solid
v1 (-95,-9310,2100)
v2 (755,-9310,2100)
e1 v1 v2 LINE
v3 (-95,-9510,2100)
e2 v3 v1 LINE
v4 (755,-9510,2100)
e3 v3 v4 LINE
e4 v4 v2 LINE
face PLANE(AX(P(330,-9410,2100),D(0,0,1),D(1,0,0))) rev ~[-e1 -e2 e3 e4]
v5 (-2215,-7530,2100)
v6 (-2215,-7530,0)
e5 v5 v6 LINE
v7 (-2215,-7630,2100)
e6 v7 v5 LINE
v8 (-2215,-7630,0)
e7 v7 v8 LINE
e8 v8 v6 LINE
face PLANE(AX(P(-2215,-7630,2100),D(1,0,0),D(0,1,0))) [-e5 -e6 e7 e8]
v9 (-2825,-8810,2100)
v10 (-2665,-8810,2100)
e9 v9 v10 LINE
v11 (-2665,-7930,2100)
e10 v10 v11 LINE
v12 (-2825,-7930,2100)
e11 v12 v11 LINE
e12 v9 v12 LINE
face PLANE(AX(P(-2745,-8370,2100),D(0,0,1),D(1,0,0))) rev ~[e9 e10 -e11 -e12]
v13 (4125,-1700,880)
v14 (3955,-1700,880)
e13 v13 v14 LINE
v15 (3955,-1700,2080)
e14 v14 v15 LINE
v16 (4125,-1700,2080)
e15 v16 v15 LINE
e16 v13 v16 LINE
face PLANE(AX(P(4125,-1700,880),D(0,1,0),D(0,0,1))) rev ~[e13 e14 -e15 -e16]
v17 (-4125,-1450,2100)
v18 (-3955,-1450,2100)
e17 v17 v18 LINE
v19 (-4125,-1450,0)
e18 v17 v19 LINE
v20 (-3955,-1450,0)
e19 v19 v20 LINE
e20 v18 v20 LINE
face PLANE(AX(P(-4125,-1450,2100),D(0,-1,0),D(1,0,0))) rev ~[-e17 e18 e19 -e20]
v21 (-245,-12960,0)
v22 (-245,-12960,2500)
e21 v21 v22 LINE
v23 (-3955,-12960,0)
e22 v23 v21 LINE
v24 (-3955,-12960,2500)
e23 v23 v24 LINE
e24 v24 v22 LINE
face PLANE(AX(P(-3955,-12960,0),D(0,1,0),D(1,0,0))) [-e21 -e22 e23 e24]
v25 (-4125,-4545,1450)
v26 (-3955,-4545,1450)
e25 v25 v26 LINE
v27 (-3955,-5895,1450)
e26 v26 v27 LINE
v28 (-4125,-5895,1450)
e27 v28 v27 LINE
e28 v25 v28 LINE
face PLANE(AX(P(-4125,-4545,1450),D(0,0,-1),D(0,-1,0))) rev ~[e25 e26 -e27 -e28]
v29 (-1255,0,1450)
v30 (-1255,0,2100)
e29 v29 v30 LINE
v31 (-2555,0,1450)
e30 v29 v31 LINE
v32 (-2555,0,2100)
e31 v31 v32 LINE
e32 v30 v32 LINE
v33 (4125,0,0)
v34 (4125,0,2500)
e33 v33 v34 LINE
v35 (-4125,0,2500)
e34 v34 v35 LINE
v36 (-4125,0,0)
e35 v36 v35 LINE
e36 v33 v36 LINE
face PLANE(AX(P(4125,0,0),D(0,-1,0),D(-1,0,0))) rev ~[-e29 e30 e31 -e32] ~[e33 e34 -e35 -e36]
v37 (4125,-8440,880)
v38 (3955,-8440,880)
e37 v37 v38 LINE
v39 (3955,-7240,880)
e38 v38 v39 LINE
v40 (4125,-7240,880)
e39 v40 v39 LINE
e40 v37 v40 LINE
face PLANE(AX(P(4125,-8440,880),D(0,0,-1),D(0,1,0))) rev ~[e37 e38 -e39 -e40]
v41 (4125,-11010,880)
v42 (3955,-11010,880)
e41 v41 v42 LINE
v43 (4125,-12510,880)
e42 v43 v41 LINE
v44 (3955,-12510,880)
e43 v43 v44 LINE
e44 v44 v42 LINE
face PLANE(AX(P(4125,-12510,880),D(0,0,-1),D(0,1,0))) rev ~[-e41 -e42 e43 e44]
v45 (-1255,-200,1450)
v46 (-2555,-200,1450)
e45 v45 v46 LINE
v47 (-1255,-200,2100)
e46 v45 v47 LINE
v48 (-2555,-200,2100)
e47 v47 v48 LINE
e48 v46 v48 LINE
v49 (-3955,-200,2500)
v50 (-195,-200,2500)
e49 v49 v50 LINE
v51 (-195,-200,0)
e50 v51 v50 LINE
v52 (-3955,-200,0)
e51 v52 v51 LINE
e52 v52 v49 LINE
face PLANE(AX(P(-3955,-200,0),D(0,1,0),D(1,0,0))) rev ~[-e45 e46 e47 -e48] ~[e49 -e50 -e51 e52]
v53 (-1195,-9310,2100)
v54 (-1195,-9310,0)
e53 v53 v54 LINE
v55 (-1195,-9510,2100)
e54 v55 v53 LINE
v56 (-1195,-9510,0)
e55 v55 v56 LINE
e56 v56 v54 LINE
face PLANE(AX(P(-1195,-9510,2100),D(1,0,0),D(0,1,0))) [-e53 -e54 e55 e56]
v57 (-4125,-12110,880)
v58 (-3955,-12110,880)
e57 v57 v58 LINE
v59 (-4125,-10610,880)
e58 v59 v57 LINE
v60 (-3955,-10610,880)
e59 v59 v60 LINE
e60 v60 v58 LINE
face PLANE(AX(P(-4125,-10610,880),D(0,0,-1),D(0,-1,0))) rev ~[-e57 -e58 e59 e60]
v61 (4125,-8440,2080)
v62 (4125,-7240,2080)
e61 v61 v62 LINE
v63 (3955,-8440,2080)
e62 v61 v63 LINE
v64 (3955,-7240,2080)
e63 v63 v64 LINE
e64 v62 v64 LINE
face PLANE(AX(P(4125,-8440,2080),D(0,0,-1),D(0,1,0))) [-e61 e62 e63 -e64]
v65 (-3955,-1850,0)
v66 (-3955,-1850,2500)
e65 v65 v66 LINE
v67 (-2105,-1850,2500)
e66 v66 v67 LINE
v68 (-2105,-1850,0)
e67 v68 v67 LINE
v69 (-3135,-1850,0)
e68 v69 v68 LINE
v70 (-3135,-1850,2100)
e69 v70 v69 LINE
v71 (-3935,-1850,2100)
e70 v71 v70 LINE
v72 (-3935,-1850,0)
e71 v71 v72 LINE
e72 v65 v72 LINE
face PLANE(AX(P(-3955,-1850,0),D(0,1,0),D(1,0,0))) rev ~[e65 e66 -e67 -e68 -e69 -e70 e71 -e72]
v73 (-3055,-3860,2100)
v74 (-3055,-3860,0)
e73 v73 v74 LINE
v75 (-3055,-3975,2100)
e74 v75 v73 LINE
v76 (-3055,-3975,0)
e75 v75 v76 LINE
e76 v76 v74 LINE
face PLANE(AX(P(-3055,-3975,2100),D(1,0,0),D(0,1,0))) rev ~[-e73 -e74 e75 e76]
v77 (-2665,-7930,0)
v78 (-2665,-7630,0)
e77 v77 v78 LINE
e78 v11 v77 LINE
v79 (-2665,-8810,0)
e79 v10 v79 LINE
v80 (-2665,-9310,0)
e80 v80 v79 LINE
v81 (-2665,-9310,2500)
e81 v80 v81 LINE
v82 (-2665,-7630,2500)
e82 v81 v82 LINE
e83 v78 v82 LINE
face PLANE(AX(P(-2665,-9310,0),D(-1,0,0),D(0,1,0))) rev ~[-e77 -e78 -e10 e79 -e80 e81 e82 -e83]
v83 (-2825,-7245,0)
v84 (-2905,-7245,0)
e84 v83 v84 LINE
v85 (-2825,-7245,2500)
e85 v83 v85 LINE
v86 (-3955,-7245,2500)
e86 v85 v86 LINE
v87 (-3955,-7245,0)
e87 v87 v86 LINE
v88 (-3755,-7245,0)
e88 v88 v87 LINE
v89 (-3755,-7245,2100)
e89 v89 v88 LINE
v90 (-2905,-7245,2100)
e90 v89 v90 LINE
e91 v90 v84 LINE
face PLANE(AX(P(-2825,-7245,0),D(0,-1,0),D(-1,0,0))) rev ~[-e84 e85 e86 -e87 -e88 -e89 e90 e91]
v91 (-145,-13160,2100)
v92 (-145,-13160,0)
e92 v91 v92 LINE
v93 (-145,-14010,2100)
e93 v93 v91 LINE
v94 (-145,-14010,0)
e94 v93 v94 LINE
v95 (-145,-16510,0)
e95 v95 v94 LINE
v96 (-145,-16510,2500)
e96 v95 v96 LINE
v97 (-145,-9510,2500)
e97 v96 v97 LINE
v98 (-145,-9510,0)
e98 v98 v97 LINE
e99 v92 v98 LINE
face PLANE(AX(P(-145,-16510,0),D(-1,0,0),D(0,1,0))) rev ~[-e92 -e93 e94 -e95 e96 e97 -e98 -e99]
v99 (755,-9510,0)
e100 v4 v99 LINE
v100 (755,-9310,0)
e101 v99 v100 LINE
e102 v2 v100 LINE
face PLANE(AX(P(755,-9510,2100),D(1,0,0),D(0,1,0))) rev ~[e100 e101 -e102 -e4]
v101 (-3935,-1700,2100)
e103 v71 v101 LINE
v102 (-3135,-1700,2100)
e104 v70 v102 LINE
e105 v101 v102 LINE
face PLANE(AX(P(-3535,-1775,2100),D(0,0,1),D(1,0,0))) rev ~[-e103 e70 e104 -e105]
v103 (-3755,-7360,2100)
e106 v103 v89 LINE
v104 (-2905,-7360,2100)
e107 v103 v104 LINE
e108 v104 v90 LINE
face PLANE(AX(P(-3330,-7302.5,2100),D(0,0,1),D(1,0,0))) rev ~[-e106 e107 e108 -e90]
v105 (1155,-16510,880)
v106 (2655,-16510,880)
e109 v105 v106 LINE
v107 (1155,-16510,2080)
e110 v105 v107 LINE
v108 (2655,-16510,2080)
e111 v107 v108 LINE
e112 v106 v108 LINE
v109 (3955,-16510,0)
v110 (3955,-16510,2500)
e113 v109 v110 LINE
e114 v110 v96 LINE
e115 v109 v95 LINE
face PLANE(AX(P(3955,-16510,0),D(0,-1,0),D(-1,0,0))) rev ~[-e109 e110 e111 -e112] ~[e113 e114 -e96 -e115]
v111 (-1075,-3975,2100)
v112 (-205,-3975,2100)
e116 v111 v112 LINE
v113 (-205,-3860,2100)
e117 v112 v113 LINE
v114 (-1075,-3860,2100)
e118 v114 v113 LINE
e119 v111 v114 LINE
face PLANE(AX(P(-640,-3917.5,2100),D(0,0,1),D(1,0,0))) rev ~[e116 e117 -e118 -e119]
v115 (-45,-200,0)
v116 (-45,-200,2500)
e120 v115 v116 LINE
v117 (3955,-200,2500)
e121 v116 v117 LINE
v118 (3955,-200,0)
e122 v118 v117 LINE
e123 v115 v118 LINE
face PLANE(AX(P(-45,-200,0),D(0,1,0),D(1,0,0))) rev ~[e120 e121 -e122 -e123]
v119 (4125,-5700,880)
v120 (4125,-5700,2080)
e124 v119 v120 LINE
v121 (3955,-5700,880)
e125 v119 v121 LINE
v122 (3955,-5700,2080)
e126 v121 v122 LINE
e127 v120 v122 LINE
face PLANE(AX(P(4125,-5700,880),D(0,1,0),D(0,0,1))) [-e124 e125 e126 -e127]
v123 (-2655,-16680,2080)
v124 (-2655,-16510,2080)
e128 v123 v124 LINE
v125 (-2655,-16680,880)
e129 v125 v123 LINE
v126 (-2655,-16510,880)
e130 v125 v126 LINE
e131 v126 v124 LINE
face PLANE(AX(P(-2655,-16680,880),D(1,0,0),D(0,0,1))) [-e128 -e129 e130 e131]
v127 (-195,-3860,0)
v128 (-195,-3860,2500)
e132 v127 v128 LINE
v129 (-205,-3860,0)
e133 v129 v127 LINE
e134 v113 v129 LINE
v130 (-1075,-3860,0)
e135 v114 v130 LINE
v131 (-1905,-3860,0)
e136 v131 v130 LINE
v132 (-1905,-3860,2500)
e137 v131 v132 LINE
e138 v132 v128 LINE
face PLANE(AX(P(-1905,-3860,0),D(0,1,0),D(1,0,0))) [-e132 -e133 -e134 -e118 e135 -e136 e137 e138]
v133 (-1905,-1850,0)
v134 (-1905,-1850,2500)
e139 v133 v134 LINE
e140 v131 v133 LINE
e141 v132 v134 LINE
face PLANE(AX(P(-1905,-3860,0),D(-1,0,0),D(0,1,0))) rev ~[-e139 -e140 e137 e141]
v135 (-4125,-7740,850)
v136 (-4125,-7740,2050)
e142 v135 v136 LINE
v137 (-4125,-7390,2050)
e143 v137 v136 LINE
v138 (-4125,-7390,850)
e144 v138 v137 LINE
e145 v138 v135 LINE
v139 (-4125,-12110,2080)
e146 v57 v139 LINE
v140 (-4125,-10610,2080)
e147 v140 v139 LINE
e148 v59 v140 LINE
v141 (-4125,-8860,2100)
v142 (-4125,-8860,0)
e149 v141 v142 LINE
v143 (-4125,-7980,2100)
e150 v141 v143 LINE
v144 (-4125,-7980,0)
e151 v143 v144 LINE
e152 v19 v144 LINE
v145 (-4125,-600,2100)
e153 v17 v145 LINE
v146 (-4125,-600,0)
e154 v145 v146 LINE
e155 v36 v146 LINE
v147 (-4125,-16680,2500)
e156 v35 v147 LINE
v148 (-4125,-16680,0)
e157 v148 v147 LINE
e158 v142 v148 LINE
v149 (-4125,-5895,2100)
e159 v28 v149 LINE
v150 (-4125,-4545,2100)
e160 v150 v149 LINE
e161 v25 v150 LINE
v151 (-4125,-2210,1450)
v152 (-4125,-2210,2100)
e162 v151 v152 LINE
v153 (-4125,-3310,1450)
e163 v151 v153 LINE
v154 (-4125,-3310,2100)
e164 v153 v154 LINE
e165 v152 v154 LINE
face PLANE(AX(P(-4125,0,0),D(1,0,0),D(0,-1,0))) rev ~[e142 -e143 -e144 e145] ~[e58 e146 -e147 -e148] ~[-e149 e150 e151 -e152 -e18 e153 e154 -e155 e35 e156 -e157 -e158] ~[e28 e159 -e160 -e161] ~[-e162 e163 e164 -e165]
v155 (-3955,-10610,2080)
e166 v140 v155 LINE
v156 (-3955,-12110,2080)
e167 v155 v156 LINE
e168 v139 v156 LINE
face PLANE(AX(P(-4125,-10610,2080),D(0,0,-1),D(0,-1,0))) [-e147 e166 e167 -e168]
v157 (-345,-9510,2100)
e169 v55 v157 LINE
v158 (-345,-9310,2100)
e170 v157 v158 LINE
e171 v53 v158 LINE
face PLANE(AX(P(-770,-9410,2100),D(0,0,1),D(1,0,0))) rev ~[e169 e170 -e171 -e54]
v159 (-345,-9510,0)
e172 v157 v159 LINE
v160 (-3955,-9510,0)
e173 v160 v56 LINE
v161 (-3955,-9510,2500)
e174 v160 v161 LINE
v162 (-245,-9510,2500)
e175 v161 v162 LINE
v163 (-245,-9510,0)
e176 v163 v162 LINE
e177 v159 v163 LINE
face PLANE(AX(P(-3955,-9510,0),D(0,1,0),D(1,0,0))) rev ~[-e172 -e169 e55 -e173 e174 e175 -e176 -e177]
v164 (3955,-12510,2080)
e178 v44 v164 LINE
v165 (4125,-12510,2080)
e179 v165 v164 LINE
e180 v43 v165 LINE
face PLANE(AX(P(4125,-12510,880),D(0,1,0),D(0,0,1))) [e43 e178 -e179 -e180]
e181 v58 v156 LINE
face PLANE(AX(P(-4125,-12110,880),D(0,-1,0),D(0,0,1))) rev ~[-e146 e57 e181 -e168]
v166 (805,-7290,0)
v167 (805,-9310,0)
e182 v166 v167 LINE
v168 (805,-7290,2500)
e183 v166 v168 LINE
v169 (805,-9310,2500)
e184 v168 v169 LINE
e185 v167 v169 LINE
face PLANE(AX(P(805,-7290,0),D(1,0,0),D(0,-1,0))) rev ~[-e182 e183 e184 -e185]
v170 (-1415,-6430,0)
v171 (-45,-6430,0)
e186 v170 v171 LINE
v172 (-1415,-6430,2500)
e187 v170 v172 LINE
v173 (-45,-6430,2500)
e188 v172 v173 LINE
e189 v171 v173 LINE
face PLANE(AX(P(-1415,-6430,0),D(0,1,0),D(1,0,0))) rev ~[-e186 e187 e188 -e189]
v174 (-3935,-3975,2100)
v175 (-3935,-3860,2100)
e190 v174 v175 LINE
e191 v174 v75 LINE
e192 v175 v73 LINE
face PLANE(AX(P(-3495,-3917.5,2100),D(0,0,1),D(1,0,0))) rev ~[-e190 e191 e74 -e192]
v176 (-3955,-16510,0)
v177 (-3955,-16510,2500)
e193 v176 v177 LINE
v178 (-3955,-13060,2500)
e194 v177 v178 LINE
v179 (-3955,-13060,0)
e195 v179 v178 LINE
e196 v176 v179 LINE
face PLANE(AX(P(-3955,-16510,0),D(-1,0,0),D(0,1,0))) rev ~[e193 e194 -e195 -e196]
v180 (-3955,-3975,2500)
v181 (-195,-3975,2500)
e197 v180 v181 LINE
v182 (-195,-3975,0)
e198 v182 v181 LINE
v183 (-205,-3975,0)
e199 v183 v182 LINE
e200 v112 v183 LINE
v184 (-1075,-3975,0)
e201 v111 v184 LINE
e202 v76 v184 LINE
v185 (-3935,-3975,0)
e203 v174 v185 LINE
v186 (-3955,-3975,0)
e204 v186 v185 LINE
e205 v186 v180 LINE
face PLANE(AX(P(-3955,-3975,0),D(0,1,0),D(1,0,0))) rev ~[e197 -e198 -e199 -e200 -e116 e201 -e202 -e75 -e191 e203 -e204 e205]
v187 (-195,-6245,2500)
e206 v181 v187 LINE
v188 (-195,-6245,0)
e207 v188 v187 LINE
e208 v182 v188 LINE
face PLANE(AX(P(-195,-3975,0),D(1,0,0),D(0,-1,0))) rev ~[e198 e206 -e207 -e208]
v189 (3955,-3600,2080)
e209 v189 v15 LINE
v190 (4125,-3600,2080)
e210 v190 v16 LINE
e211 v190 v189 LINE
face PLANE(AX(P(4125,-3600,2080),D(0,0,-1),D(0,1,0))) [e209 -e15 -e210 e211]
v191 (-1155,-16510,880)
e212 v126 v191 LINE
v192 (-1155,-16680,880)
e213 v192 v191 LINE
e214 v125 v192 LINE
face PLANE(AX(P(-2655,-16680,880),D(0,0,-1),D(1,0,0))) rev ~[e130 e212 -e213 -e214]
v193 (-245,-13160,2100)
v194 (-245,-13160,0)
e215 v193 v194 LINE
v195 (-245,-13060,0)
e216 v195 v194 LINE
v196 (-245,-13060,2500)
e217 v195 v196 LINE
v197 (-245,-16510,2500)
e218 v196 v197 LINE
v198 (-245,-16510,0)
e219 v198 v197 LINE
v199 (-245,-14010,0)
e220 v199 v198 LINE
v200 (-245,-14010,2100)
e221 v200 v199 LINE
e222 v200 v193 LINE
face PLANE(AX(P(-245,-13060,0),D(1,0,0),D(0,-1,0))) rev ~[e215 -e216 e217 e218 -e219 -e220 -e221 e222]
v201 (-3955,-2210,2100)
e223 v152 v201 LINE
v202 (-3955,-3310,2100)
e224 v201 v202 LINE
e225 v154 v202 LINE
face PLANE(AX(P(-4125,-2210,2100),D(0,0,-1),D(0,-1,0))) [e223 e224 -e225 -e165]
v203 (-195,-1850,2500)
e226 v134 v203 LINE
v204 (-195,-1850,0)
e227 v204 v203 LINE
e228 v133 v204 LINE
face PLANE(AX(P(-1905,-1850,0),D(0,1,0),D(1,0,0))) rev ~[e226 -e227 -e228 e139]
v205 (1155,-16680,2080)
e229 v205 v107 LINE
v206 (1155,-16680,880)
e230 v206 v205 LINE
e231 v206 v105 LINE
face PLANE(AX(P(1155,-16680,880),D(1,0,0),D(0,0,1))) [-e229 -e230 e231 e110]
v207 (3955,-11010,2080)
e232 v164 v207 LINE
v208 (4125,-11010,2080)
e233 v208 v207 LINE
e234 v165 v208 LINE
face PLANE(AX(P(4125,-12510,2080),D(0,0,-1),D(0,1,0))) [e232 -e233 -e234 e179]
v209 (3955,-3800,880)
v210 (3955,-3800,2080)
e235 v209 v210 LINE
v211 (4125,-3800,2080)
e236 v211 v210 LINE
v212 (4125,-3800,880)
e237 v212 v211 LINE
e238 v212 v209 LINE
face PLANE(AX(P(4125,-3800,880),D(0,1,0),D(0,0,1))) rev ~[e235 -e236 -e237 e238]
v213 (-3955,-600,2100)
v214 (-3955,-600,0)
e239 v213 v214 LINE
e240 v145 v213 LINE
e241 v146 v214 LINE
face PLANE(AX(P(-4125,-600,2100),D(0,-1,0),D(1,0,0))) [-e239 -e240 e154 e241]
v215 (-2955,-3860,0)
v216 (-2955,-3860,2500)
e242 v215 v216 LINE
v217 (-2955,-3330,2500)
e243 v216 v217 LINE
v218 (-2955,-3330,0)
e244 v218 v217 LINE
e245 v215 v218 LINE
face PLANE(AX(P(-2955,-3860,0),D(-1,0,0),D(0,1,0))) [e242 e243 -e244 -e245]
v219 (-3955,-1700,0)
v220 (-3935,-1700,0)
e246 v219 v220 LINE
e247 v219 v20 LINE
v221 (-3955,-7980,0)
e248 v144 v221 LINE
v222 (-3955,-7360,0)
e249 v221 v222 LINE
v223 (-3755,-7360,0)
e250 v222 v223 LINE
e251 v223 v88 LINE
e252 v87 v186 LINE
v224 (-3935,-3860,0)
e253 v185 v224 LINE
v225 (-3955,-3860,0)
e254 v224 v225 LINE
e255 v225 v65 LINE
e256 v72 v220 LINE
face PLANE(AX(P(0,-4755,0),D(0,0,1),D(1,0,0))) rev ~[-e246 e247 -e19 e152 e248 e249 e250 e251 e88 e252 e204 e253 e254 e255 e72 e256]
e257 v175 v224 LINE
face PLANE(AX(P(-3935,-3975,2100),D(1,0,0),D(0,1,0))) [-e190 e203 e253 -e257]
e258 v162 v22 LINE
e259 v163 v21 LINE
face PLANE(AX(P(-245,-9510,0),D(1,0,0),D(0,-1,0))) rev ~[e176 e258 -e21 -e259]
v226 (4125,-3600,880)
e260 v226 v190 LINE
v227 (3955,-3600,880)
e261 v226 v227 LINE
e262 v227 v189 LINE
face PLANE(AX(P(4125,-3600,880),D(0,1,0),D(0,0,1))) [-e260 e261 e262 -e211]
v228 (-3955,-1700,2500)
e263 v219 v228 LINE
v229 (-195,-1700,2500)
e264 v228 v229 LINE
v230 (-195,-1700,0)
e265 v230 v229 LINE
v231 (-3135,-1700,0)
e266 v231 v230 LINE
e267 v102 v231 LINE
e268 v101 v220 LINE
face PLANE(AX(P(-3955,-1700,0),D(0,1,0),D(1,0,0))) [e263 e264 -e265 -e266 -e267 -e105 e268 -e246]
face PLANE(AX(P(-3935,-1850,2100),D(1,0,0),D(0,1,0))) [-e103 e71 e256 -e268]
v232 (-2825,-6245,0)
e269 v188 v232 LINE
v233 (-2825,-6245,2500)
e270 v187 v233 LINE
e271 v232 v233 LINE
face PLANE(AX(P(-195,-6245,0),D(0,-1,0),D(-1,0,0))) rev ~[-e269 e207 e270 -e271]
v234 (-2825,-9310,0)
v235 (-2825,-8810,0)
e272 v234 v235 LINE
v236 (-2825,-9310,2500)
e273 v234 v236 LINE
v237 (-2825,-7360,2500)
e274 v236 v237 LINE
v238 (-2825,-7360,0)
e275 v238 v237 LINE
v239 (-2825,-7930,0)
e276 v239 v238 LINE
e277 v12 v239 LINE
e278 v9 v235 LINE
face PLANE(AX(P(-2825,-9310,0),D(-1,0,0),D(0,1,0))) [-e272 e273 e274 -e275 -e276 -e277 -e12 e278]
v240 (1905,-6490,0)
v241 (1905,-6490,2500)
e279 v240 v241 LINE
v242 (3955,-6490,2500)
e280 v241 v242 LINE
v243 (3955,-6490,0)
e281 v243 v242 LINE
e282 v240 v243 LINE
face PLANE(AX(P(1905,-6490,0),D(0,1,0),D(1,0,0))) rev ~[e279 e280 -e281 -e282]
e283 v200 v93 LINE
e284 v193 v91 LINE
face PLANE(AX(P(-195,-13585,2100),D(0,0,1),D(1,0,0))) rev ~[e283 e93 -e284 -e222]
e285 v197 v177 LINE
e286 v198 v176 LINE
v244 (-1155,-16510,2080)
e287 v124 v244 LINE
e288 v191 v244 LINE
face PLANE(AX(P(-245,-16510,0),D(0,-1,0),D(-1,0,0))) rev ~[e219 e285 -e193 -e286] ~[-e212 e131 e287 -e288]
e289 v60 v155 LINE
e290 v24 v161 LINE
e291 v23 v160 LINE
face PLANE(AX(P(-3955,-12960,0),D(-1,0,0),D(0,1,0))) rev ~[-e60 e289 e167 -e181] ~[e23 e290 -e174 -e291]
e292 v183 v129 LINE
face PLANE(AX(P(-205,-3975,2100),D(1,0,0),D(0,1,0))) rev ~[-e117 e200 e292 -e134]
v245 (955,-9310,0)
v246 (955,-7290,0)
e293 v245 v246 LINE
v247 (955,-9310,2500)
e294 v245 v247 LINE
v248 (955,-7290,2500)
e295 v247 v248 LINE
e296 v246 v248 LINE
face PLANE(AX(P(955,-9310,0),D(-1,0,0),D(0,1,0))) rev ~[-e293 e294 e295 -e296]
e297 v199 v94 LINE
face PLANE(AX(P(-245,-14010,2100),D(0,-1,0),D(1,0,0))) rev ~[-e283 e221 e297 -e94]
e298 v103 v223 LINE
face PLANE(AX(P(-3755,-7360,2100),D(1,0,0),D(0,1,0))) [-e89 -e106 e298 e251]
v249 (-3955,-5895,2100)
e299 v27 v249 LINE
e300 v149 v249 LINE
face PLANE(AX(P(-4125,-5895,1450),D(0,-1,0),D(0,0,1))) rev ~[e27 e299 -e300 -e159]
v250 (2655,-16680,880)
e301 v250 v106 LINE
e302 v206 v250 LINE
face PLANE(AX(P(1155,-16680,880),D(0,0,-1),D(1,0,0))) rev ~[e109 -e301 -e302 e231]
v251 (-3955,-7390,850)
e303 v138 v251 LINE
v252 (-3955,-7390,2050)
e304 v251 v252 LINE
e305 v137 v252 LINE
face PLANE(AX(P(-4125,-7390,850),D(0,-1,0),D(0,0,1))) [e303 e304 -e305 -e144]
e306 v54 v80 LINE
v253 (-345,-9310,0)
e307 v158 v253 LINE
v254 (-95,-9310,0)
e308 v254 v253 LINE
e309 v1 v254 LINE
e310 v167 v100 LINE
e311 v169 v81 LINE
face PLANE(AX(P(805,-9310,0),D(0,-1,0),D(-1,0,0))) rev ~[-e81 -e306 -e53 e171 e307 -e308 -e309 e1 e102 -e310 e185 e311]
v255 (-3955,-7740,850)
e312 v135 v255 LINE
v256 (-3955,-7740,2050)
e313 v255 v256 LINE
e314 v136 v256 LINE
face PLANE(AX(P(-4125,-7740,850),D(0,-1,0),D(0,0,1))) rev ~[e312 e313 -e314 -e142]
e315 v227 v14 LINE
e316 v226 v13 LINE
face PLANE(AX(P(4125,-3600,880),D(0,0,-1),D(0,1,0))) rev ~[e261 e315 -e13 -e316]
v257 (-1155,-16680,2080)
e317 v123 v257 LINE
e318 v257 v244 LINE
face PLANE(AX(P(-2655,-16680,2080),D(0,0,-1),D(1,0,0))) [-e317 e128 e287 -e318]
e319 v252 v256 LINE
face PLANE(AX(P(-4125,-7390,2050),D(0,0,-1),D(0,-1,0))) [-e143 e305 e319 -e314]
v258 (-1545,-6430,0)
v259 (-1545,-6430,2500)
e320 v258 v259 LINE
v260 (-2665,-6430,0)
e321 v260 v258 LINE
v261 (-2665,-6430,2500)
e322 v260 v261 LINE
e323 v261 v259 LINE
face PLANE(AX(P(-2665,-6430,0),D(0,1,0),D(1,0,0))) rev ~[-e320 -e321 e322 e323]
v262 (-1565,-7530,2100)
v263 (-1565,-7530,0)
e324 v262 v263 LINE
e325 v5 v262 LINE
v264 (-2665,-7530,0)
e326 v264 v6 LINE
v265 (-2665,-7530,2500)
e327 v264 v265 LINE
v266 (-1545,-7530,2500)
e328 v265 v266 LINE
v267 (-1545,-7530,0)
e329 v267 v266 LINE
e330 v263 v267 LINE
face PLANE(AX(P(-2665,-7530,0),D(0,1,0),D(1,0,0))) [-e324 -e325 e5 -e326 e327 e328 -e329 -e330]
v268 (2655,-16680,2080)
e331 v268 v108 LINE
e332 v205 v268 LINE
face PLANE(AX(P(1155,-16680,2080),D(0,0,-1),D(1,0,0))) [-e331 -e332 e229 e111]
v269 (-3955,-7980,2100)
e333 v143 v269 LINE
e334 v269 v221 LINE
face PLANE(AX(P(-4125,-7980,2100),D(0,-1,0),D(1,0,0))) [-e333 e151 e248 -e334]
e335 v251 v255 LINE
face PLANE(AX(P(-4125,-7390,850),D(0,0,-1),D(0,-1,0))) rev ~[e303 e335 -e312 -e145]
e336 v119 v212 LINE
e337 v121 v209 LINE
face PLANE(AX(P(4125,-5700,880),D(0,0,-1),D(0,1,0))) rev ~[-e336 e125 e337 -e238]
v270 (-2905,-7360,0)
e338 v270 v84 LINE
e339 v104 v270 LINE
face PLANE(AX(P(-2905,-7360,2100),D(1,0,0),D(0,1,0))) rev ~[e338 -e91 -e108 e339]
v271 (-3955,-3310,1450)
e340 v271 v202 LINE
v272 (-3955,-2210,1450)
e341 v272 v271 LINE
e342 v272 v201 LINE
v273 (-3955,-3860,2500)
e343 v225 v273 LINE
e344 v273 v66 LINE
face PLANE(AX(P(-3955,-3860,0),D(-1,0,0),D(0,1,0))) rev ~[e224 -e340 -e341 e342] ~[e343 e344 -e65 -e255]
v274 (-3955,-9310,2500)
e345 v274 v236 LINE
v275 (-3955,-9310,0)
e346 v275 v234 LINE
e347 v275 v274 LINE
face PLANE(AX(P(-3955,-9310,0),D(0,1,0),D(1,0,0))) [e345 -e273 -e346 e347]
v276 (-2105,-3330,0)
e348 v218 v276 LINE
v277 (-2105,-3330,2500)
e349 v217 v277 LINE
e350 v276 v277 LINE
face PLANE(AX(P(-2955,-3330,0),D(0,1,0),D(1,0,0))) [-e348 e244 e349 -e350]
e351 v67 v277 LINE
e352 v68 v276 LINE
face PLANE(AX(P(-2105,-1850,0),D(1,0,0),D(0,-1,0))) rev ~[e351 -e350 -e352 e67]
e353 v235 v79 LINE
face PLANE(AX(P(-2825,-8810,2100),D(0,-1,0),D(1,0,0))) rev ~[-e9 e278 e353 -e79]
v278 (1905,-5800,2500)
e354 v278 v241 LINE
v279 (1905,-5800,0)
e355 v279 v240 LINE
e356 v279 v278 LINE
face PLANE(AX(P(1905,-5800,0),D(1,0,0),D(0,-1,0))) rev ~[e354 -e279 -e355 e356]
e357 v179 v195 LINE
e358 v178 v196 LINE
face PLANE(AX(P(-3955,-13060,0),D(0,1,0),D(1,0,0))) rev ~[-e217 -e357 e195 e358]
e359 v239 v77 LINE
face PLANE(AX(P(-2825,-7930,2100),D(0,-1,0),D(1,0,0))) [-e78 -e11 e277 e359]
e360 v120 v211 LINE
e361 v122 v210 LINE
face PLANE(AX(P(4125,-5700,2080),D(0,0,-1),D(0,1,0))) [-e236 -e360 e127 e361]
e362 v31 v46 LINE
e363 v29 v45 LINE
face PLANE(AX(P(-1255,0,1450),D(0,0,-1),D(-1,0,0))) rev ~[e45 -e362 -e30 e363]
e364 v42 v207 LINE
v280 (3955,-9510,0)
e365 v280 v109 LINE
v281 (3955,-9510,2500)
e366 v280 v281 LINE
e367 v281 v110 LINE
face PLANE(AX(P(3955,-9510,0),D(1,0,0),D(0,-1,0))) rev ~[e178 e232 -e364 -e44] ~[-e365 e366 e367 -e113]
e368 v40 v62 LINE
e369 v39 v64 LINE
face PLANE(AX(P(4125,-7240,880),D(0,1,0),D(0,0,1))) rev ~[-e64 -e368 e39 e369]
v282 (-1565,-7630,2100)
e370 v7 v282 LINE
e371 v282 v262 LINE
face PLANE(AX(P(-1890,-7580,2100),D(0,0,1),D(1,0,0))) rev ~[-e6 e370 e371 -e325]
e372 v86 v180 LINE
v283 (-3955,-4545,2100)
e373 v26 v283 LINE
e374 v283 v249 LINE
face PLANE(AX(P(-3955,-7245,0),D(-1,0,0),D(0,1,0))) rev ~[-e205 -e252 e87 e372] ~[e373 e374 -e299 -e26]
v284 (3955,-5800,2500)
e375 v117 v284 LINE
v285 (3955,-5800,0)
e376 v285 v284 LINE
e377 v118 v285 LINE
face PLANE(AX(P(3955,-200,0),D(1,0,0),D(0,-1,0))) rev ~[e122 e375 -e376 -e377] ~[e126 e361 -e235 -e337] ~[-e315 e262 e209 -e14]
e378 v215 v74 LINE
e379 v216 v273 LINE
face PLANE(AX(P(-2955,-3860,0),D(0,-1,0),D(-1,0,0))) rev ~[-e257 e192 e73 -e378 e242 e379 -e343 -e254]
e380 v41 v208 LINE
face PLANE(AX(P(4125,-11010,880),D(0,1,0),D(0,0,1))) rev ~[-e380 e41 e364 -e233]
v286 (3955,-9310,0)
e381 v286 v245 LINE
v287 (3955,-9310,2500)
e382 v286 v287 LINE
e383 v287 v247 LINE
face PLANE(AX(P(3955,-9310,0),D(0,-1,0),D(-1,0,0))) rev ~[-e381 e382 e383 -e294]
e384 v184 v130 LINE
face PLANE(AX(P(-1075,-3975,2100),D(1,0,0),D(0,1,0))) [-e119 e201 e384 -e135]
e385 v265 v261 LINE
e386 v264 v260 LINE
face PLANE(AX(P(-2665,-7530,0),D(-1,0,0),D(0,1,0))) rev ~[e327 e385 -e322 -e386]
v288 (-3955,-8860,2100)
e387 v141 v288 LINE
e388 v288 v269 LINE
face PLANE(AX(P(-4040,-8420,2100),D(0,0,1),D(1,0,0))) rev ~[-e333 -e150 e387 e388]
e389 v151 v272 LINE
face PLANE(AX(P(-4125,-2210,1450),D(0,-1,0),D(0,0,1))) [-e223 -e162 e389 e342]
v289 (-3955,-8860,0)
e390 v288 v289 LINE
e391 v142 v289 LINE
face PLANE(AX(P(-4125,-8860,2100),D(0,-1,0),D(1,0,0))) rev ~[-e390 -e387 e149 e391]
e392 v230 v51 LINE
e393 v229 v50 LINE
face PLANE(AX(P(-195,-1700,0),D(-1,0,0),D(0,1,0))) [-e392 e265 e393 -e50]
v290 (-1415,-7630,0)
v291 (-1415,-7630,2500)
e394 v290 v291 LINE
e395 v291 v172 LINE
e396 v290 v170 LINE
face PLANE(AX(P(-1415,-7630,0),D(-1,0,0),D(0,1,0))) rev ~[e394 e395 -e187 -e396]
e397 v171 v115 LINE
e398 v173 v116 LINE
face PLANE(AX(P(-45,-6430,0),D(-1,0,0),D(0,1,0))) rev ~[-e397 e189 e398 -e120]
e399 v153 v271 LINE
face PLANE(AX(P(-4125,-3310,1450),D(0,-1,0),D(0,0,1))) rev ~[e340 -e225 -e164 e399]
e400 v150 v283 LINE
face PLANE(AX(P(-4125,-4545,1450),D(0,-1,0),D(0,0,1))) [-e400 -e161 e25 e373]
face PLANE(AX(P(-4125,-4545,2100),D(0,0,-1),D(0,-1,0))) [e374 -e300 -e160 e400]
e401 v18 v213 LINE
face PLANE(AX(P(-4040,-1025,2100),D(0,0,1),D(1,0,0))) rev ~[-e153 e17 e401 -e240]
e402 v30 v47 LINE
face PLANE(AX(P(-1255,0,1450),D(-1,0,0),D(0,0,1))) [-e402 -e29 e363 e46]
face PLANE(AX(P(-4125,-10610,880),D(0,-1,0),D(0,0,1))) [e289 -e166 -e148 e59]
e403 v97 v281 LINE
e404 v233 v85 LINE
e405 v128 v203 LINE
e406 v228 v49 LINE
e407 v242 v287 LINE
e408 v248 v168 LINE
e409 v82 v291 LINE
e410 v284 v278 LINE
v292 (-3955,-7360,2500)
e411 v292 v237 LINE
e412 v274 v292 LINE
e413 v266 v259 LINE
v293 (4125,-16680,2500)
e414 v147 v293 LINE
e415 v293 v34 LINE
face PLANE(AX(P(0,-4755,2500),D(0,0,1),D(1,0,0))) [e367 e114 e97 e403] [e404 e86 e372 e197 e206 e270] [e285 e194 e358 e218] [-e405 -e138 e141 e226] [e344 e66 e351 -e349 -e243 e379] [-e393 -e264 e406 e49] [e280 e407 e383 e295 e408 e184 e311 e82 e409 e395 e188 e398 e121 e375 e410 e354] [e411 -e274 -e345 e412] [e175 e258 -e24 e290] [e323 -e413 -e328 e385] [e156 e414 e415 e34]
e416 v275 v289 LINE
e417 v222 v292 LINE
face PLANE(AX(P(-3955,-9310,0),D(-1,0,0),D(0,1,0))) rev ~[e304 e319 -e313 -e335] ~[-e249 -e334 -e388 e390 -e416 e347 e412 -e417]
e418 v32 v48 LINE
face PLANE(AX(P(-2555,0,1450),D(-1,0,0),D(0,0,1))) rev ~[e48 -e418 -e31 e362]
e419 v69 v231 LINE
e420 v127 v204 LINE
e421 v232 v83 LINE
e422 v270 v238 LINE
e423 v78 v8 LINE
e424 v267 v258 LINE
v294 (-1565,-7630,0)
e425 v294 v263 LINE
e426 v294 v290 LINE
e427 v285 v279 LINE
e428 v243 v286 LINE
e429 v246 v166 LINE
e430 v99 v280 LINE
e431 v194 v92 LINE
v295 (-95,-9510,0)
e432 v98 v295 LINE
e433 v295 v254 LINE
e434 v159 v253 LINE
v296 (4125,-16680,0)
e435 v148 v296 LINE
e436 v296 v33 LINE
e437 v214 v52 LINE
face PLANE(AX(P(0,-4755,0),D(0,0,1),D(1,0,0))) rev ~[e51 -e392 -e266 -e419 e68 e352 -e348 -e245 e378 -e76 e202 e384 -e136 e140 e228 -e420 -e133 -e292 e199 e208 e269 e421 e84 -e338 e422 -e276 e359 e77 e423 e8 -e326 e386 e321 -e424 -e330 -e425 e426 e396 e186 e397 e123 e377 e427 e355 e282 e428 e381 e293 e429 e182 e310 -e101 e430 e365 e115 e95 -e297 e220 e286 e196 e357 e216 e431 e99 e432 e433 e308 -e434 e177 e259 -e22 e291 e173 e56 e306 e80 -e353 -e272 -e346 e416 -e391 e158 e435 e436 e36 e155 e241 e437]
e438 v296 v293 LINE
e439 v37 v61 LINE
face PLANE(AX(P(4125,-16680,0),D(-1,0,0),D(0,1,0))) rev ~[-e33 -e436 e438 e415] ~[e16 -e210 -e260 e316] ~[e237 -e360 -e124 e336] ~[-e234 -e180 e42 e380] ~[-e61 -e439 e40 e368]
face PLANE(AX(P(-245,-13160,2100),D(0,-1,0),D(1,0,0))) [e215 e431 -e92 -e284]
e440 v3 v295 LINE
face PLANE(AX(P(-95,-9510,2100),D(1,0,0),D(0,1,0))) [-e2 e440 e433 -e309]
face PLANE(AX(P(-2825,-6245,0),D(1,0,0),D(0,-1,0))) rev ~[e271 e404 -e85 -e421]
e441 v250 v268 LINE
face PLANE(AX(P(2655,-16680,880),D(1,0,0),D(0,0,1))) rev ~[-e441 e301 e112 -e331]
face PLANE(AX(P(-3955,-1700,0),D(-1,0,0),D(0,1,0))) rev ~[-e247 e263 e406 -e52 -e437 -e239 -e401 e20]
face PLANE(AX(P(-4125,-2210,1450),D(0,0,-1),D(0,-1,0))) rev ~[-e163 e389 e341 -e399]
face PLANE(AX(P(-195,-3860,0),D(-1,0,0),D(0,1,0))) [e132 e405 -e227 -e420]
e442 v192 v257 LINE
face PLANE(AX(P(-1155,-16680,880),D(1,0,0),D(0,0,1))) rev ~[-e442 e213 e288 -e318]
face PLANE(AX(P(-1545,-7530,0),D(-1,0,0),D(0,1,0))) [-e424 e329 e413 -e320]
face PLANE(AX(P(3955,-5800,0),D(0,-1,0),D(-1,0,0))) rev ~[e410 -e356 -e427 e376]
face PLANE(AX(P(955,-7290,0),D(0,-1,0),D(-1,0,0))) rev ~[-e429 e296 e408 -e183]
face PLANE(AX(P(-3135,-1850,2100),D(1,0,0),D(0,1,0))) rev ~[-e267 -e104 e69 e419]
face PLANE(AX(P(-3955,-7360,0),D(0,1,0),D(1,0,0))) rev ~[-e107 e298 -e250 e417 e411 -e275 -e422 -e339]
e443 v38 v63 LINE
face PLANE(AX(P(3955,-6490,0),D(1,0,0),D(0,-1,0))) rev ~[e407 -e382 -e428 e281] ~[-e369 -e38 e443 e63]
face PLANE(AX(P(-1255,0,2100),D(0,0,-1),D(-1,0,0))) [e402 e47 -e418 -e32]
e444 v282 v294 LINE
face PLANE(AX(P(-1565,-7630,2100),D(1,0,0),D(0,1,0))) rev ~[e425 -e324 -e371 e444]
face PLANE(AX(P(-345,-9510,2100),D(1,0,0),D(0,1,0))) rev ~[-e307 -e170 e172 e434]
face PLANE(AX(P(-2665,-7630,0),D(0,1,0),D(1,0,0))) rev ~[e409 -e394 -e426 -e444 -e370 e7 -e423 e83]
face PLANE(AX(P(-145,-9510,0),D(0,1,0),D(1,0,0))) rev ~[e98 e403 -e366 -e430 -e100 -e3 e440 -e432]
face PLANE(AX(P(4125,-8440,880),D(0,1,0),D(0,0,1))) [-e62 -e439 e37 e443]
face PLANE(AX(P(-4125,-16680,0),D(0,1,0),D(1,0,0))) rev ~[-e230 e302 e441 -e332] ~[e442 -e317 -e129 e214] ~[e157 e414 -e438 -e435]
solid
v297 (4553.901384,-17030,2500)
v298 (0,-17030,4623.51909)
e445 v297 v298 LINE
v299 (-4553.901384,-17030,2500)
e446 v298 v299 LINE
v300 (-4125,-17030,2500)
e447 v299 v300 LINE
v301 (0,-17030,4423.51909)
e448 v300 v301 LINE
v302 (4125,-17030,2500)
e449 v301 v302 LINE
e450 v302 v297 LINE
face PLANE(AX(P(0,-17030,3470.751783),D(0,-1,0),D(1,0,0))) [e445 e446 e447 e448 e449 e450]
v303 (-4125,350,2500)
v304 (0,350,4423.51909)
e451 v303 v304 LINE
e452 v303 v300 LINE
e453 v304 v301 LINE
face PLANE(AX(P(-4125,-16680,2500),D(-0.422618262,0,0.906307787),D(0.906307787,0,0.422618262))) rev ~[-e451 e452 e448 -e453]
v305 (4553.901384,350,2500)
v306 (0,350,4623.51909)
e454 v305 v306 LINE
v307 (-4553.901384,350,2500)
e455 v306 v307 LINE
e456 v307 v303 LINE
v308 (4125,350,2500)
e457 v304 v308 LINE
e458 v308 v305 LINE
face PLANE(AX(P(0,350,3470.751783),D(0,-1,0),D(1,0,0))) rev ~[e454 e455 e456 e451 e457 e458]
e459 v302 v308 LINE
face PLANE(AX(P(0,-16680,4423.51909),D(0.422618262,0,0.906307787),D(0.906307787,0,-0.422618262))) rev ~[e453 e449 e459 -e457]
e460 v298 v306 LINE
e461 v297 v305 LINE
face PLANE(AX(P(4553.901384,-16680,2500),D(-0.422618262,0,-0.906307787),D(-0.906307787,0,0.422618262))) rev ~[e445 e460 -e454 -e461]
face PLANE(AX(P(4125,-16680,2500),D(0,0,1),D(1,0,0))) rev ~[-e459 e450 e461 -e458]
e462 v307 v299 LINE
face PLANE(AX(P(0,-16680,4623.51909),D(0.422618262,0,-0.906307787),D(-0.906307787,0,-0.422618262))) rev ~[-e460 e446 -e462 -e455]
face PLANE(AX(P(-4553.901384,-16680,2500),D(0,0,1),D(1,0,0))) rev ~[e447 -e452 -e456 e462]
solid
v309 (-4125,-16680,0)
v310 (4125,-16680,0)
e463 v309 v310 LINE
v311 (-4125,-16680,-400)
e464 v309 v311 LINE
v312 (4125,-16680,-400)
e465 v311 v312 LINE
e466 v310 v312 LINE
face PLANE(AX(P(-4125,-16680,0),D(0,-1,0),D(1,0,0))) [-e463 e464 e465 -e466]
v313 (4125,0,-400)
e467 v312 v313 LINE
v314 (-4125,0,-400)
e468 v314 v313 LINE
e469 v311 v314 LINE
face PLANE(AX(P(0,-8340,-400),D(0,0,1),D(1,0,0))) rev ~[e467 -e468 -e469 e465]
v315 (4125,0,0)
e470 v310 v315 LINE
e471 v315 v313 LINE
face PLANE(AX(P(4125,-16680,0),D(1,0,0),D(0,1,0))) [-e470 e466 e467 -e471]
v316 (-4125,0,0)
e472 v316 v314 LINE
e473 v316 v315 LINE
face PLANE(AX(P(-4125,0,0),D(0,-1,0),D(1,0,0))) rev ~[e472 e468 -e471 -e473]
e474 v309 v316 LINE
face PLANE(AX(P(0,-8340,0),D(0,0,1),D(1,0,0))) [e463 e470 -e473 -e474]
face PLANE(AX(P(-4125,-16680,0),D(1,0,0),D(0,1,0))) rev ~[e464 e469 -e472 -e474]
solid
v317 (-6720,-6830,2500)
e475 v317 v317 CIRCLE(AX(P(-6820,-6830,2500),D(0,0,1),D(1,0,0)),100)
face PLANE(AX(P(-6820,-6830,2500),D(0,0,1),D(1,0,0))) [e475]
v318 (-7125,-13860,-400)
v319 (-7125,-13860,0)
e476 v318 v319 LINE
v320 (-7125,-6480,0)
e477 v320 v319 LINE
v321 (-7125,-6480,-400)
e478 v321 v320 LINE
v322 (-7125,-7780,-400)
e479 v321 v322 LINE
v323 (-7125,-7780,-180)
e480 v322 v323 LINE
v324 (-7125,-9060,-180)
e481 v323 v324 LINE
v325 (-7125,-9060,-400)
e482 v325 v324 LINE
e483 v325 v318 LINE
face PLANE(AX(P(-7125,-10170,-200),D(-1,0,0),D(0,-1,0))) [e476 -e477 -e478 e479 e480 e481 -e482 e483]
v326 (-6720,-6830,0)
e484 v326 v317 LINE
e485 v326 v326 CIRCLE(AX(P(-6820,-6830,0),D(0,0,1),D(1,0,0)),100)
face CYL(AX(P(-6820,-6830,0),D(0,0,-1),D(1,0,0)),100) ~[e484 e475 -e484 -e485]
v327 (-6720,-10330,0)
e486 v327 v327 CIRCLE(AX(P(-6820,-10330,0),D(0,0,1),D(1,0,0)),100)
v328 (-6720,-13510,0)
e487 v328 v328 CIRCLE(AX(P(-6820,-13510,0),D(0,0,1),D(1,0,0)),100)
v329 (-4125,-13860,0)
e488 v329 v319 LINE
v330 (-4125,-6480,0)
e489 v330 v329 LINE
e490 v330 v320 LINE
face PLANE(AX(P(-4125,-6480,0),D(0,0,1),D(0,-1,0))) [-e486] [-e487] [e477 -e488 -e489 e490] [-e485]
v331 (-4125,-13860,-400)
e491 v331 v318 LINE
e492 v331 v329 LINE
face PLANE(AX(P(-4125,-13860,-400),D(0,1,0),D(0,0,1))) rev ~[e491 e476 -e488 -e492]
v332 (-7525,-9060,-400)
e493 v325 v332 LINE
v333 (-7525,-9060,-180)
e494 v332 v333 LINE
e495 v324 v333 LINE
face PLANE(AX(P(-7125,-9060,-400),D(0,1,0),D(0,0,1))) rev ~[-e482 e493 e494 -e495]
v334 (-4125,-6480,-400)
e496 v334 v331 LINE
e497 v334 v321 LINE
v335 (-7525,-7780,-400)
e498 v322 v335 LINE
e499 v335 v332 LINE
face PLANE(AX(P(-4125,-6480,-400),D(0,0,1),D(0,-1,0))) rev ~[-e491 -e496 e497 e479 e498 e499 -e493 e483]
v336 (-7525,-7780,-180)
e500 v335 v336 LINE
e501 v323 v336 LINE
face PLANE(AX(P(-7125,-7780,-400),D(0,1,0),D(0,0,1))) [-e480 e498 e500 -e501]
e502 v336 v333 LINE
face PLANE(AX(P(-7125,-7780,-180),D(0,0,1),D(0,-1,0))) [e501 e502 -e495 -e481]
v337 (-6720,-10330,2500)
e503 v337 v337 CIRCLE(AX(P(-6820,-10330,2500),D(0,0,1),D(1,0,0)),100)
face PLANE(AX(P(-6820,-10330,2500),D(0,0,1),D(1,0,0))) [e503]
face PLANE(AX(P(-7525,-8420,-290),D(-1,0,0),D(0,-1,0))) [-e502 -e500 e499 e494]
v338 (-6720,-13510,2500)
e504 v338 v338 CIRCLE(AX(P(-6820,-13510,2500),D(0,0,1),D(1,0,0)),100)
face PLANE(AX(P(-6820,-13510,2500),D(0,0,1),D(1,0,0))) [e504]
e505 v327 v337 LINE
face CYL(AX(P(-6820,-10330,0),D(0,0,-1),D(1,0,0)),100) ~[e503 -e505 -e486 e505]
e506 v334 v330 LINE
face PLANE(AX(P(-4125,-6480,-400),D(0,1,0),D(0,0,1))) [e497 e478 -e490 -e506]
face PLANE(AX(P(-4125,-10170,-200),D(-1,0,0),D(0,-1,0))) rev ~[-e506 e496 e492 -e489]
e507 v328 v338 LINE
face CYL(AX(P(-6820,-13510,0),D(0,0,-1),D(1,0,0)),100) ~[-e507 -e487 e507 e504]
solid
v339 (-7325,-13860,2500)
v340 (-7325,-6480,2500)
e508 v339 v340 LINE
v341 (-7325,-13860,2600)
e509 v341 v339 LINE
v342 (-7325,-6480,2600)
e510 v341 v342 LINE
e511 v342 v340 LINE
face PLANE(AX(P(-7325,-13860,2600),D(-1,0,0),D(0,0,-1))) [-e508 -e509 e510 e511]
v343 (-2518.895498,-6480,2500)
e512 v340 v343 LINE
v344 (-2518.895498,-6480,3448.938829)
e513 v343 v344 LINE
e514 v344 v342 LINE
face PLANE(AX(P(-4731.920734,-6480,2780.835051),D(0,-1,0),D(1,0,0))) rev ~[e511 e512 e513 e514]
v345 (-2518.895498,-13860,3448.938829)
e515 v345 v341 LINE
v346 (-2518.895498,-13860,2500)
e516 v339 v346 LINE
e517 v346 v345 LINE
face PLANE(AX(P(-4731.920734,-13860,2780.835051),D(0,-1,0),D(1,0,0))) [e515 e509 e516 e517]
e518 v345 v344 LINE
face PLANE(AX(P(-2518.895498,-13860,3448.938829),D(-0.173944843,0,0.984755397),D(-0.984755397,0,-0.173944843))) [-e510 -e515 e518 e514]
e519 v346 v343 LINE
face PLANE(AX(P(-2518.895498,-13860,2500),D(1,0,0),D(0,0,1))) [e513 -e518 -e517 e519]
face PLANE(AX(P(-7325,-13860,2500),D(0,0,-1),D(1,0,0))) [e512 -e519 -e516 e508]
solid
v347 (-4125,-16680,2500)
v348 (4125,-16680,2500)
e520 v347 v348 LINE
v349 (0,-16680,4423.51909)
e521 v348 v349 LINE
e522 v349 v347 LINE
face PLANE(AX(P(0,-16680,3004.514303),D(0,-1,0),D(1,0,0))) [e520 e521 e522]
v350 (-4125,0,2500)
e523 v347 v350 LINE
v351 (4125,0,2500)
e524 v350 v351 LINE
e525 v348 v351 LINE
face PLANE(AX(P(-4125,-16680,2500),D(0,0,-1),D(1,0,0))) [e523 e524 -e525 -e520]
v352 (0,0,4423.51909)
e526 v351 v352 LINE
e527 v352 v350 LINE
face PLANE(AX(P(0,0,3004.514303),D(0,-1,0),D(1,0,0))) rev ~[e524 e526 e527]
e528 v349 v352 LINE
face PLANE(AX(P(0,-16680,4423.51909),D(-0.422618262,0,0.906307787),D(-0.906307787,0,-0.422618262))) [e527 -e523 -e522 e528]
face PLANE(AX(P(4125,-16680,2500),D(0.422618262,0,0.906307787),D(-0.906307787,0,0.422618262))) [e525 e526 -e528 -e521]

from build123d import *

# Parameters (mm, degrees)
F0_W           = 1130
F0_H           = 1950
F0_W_2         = 1120
F0_H_2         = 1100
F0_W_3         = 3760
F0_H_3         = 1500
F0_W_4         = 1710
F0_H_4         = 2010
F0_W_5         = 850
F0_H_5         = 530
F0_W_6         = 3710
F0_H_6         = 100
F1_DEPTH       = 2500
F3_START       = -400
F2_W           = 170
F2_H           = 850
F2_W_2         = 800
F2_H_2         = 150
F2_W_3         = 880
F2_H_3         = 115
F2_W_4         = 870
F2_W_5         = 850
F2_H_4         = 880
F2_W_6         = 650
F2_H_5         = 100
F2_W_7         = 160
F2_H_6         = 200
F2_W_8         = 100
F3_DEPTH       = 2100
F4_W           = 8250
F4_H           = 16680
F5_DEPTH       = 400
F6_W           = 1100
F6_H           = 650
F6_W_2         = 1350
F6_W_3         = 350
F6_H_2         = 1200
F6_W_4         = 1500
F10_DEPTH      = 170
F7_W           = 1300
F7_H           = 650
F11_DEPTH      = 200
F8_W           = 1200
F8_H           = 1200
F8_W_2         = 1900
F8_W_3         = 1500
F12_DEPTH      = 170
F9_W           = 1500
F9_H           = 1200
F13_DEPTH      = 170
F15_DEPTH      = 16680
F17_DEPTH      = 17030
F17_DEPTH_BACK = 350
F18_W          = 7380
F18_H          = 400
F19_DEPTH      = 3000
F20_W          = 1280
F20_H          = 220
F21_DEPTH      = 400
F22_R          = 100
F23_DEPTH      = 2500
F25_DEPTH      = 7380


# Not quite as in the source:
# - a feature names something its author has since deleted; it is built from what else it names


with BuildPart() as f1:
    # F0 (on Top) → F1 (new body)
    with BuildSketch(Plane.XY):
        Polygon((4125, 0), (-4125, 0), (-4125, -9510), (-3955, -9510), (-245, -9510), (-145, -9510), (3955, -9510), (4125, -9510), align=None)
        with Locations((-3390, -8335)):
            Rectangle(F0_W, F0_H, mode=Mode.SUBTRACT)
        with Locations((-2105, -6980)):
            Rectangle(F0_W_2, F0_H_2, mode=Mode.SUBTRACT)
        Polygon((-3955, -6245), (-3955, -3975), (-195, -3975), (-195, -6245), (-2825, -6245), (-2825, -7245), (-3955, -7245), align=None, mode=Mode.SUBTRACT)
        Polygon((-3955, -3860), (-3955, -1850), (-2105, -1850), (-2105, -3330), (-2105, -3860), (-2955, -3860), align=None, mode=Mode.SUBTRACT)
        with Locations((-2075, -950)):
            Rectangle(F0_W_3, F0_H_3, mode=Mode.SUBTRACT)
        with Locations((-1050, -2855)):
            Rectangle(F0_W_4, F0_H_4, mode=Mode.SUBTRACT)
        Polygon((-45, -6430), (-45, -200), (3955, -200), (3955, -5800), (1905, -5800), (1905, -6490), (3955, -6490), (3955, -9310), (955, -9310), (955, -7290), (805, -7290), (805, -9310), (-2665, -9310), (-2665, -7630), (-1415, -7630), (-1415, -6430), align=None, mode=Mode.SUBTRACT)
        with Locations((-2530, -3595)):
            Rectangle(F0_W_5, F0_H_5)
        Polygon((-145, -9510), (-245, -9510), (-245, -12960), (-245, -13060), (-245, -16510), (-145, -16510), align=None)
        with Locations((-2100, -13010)):
            Rectangle(F0_W_6, F0_H_6)
        Polygon((-3955, -9510), (-4125, -9510), (-4125, -16680), (4125, -16680), (4125, -9510), (3955, -9510), (3955, -16510), (-145, -16510), (-245, -16510), (-3955, -16510), (-3955, -13060), (-3955, -12960), align=None)
    extrude(amount=F1_DEPTH)

    # F2 (on face) → F3 (cut)
    with BuildSketch(Plane.XY.offset(2500).offset(F3_START)):
        with Locations((-4040, -1025)):
            Rectangle(F2_W, F2_H)
        with Locations((-3535, -1775)):
            Rectangle(F2_W_2, F2_H_2)
        with Locations((-3495, -3917.5)):
            Rectangle(F2_W_3, F2_H_3)
        with Locations((-640, -3917.5)):
            Rectangle(F2_W_4, F2_H_3)
        with Locations((-3330, -7302.5)):
            Rectangle(F2_W_5, F2_H_3)
        with Locations((-4040, -8420)):
            Rectangle(F2_W, F2_H_4)
        with Locations((-1890, -7580)):
            Rectangle(F2_W_6, F2_H_5)
        with Locations((-2745, -8370)):
            Rectangle(F2_W_7, F2_H_4)
        with Locations((-770, -9410)):
            Rectangle(F2_W_5, F2_H_6)
        with Locations((330, -9410)):
            Rectangle(F2_W_5, F2_H_6)
        with Locations((-195, -13585)):
            Rectangle(F2_W_8, F2_H)
    extrude(amount=-F3_DEPTH, mode=Mode.SUBTRACT)

    # F6 (on face) → F10 (cut, through all)
    with BuildSketch(Plane(origin=(-4125, 0, 0), x_dir=(0, -1, 0), z_dir=(-1, 0, 0))):
        with Locations((2760, 1775)):
            Rectangle(F6_W, F6_H)
        with Locations((5220, 1775)):
            Rectangle(F6_W_2, F6_H)
        with Locations((7565, 1450)):
            Rectangle(F6_W_3, F6_H_2)
        with Locations((11360, 1480)):
            Rectangle(F6_W_4, F6_H_2)
    extrude(amount=-F10_DEPTH, mode=Mode.SUBTRACT)

    # F7 (on face) → F11 (cut, through all)
    with BuildSketch(Plane(origin=(0, 0, 0), x_dir=(-1, 0, 0), z_dir=(0, 1, 0))):
        with Locations((1905, 1775)):
            Rectangle(F7_W, F7_H)
    extrude(amount=-F11_DEPTH, mode=Mode.SUBTRACT)

    # F8 (on face) → F12 (cut, through all)
    with BuildSketch(Plane.YZ.offset(4125)):
        with Locations((-7840, 1480)):
            Rectangle(F8_W, F8_H)
        with Locations((-4750, 1480)):
            Rectangle(F8_W_2, F8_H)
        with Locations((-2650, 1480)):
            Rectangle(F8_W_2, F8_H)
        with Locations((-11760, 1480)):
            Rectangle(F8_W_3, F8_H)
    extrude(amount=-F12_DEPTH, mode=Mode.SUBTRACT)

    # F9 (on face) → F13 (cut, through all)
    with BuildSketch(Plane.XZ.offset(16680)):
        with Locations((-1905, 1480)):
            Rectangle(F9_W, F9_H)
        with Locations((1905, 1480)):
            Rectangle(F9_W, F9_H)
    extrude(amount=-F13_DEPTH, mode=Mode.SUBTRACT)


with BuildPart() as f5:
    # F4 (on Top) → F5 (new body)
    with BuildSketch(Plane.XY):
        with Locations((0, -8340)):
            Rectangle(F4_W, F4_H)
    extrude(amount=-F5_DEPTH)


with BuildPart() as f15:
    # F14 (on face) → F15 (new body, through all)
    with BuildSketch(Plane.XZ.offset(16680)):
        Polygon((-4125, 2500), (4125, 2500), (0, 4423.5190898894), align=None)
    extrude(amount=-F15_DEPTH)


with BuildPart() as f17:
    # F16 (on face) → F17 (new body, two sides)
    with BuildSketch(Plane.XZ.offset(16680)) as f17_sk:
        Polygon((0, 4623.5190898894), (-4553.9013841019, 2500), (-4125, 2500), (0, 4423.5190898894), (4125, 2500), (4553.9013841019, 2500), align=None)
    extrude(amount=-F17_DEPTH)
    extrude(f17_sk.sketch, amount=F17_DEPTH_BACK)


with BuildPart() as f19:
    # F18 (on face) → F19 (new body)
    with BuildSketch(Plane(origin=(-4125, 0, 0), x_dir=(0, -1, 0), z_dir=(-1, 0, 0))):
        with Locations((10170, -200)):
            Rectangle(F18_W, F18_H)
    extrude(amount=F19_DEPTH)

    # F20 (on face) → F21 (join)
    with BuildSketch(Plane(origin=(-7125, 0, 0), x_dir=(0, -1, 0), z_dir=(-1, 0, 0))):
        with Locations((8420, -290)):
            Rectangle(F20_W, F20_H)
    extrude(amount=F21_DEPTH)

    # F22 (on face) → F23 (join)
    with BuildSketch(Plane.XY):
        with Locations((-6820, -6830)):
            Circle(F22_R)
        with Locations((-6820, -13510)):
            Circle(F22_R)
        with Locations((-6820, -10330)):
            Circle(F22_R)
    extrude(amount=F23_DEPTH)


with BuildPart() as f25:
    # F24 (on face) → F25 (new body, through all)
    with BuildSketch(Plane.XZ.offset(13860)):
        Polygon((-7325, 2500), (-2518.8954975725, 2500), (-2518.8954975725, 3448.9388292792), (-7325, 2600), align=None)
    extrude(amount=-F25_DEPTH)


solid = Compound([f1.part, f5.part, f15.part, f17.part, f19.part, f25.part])
